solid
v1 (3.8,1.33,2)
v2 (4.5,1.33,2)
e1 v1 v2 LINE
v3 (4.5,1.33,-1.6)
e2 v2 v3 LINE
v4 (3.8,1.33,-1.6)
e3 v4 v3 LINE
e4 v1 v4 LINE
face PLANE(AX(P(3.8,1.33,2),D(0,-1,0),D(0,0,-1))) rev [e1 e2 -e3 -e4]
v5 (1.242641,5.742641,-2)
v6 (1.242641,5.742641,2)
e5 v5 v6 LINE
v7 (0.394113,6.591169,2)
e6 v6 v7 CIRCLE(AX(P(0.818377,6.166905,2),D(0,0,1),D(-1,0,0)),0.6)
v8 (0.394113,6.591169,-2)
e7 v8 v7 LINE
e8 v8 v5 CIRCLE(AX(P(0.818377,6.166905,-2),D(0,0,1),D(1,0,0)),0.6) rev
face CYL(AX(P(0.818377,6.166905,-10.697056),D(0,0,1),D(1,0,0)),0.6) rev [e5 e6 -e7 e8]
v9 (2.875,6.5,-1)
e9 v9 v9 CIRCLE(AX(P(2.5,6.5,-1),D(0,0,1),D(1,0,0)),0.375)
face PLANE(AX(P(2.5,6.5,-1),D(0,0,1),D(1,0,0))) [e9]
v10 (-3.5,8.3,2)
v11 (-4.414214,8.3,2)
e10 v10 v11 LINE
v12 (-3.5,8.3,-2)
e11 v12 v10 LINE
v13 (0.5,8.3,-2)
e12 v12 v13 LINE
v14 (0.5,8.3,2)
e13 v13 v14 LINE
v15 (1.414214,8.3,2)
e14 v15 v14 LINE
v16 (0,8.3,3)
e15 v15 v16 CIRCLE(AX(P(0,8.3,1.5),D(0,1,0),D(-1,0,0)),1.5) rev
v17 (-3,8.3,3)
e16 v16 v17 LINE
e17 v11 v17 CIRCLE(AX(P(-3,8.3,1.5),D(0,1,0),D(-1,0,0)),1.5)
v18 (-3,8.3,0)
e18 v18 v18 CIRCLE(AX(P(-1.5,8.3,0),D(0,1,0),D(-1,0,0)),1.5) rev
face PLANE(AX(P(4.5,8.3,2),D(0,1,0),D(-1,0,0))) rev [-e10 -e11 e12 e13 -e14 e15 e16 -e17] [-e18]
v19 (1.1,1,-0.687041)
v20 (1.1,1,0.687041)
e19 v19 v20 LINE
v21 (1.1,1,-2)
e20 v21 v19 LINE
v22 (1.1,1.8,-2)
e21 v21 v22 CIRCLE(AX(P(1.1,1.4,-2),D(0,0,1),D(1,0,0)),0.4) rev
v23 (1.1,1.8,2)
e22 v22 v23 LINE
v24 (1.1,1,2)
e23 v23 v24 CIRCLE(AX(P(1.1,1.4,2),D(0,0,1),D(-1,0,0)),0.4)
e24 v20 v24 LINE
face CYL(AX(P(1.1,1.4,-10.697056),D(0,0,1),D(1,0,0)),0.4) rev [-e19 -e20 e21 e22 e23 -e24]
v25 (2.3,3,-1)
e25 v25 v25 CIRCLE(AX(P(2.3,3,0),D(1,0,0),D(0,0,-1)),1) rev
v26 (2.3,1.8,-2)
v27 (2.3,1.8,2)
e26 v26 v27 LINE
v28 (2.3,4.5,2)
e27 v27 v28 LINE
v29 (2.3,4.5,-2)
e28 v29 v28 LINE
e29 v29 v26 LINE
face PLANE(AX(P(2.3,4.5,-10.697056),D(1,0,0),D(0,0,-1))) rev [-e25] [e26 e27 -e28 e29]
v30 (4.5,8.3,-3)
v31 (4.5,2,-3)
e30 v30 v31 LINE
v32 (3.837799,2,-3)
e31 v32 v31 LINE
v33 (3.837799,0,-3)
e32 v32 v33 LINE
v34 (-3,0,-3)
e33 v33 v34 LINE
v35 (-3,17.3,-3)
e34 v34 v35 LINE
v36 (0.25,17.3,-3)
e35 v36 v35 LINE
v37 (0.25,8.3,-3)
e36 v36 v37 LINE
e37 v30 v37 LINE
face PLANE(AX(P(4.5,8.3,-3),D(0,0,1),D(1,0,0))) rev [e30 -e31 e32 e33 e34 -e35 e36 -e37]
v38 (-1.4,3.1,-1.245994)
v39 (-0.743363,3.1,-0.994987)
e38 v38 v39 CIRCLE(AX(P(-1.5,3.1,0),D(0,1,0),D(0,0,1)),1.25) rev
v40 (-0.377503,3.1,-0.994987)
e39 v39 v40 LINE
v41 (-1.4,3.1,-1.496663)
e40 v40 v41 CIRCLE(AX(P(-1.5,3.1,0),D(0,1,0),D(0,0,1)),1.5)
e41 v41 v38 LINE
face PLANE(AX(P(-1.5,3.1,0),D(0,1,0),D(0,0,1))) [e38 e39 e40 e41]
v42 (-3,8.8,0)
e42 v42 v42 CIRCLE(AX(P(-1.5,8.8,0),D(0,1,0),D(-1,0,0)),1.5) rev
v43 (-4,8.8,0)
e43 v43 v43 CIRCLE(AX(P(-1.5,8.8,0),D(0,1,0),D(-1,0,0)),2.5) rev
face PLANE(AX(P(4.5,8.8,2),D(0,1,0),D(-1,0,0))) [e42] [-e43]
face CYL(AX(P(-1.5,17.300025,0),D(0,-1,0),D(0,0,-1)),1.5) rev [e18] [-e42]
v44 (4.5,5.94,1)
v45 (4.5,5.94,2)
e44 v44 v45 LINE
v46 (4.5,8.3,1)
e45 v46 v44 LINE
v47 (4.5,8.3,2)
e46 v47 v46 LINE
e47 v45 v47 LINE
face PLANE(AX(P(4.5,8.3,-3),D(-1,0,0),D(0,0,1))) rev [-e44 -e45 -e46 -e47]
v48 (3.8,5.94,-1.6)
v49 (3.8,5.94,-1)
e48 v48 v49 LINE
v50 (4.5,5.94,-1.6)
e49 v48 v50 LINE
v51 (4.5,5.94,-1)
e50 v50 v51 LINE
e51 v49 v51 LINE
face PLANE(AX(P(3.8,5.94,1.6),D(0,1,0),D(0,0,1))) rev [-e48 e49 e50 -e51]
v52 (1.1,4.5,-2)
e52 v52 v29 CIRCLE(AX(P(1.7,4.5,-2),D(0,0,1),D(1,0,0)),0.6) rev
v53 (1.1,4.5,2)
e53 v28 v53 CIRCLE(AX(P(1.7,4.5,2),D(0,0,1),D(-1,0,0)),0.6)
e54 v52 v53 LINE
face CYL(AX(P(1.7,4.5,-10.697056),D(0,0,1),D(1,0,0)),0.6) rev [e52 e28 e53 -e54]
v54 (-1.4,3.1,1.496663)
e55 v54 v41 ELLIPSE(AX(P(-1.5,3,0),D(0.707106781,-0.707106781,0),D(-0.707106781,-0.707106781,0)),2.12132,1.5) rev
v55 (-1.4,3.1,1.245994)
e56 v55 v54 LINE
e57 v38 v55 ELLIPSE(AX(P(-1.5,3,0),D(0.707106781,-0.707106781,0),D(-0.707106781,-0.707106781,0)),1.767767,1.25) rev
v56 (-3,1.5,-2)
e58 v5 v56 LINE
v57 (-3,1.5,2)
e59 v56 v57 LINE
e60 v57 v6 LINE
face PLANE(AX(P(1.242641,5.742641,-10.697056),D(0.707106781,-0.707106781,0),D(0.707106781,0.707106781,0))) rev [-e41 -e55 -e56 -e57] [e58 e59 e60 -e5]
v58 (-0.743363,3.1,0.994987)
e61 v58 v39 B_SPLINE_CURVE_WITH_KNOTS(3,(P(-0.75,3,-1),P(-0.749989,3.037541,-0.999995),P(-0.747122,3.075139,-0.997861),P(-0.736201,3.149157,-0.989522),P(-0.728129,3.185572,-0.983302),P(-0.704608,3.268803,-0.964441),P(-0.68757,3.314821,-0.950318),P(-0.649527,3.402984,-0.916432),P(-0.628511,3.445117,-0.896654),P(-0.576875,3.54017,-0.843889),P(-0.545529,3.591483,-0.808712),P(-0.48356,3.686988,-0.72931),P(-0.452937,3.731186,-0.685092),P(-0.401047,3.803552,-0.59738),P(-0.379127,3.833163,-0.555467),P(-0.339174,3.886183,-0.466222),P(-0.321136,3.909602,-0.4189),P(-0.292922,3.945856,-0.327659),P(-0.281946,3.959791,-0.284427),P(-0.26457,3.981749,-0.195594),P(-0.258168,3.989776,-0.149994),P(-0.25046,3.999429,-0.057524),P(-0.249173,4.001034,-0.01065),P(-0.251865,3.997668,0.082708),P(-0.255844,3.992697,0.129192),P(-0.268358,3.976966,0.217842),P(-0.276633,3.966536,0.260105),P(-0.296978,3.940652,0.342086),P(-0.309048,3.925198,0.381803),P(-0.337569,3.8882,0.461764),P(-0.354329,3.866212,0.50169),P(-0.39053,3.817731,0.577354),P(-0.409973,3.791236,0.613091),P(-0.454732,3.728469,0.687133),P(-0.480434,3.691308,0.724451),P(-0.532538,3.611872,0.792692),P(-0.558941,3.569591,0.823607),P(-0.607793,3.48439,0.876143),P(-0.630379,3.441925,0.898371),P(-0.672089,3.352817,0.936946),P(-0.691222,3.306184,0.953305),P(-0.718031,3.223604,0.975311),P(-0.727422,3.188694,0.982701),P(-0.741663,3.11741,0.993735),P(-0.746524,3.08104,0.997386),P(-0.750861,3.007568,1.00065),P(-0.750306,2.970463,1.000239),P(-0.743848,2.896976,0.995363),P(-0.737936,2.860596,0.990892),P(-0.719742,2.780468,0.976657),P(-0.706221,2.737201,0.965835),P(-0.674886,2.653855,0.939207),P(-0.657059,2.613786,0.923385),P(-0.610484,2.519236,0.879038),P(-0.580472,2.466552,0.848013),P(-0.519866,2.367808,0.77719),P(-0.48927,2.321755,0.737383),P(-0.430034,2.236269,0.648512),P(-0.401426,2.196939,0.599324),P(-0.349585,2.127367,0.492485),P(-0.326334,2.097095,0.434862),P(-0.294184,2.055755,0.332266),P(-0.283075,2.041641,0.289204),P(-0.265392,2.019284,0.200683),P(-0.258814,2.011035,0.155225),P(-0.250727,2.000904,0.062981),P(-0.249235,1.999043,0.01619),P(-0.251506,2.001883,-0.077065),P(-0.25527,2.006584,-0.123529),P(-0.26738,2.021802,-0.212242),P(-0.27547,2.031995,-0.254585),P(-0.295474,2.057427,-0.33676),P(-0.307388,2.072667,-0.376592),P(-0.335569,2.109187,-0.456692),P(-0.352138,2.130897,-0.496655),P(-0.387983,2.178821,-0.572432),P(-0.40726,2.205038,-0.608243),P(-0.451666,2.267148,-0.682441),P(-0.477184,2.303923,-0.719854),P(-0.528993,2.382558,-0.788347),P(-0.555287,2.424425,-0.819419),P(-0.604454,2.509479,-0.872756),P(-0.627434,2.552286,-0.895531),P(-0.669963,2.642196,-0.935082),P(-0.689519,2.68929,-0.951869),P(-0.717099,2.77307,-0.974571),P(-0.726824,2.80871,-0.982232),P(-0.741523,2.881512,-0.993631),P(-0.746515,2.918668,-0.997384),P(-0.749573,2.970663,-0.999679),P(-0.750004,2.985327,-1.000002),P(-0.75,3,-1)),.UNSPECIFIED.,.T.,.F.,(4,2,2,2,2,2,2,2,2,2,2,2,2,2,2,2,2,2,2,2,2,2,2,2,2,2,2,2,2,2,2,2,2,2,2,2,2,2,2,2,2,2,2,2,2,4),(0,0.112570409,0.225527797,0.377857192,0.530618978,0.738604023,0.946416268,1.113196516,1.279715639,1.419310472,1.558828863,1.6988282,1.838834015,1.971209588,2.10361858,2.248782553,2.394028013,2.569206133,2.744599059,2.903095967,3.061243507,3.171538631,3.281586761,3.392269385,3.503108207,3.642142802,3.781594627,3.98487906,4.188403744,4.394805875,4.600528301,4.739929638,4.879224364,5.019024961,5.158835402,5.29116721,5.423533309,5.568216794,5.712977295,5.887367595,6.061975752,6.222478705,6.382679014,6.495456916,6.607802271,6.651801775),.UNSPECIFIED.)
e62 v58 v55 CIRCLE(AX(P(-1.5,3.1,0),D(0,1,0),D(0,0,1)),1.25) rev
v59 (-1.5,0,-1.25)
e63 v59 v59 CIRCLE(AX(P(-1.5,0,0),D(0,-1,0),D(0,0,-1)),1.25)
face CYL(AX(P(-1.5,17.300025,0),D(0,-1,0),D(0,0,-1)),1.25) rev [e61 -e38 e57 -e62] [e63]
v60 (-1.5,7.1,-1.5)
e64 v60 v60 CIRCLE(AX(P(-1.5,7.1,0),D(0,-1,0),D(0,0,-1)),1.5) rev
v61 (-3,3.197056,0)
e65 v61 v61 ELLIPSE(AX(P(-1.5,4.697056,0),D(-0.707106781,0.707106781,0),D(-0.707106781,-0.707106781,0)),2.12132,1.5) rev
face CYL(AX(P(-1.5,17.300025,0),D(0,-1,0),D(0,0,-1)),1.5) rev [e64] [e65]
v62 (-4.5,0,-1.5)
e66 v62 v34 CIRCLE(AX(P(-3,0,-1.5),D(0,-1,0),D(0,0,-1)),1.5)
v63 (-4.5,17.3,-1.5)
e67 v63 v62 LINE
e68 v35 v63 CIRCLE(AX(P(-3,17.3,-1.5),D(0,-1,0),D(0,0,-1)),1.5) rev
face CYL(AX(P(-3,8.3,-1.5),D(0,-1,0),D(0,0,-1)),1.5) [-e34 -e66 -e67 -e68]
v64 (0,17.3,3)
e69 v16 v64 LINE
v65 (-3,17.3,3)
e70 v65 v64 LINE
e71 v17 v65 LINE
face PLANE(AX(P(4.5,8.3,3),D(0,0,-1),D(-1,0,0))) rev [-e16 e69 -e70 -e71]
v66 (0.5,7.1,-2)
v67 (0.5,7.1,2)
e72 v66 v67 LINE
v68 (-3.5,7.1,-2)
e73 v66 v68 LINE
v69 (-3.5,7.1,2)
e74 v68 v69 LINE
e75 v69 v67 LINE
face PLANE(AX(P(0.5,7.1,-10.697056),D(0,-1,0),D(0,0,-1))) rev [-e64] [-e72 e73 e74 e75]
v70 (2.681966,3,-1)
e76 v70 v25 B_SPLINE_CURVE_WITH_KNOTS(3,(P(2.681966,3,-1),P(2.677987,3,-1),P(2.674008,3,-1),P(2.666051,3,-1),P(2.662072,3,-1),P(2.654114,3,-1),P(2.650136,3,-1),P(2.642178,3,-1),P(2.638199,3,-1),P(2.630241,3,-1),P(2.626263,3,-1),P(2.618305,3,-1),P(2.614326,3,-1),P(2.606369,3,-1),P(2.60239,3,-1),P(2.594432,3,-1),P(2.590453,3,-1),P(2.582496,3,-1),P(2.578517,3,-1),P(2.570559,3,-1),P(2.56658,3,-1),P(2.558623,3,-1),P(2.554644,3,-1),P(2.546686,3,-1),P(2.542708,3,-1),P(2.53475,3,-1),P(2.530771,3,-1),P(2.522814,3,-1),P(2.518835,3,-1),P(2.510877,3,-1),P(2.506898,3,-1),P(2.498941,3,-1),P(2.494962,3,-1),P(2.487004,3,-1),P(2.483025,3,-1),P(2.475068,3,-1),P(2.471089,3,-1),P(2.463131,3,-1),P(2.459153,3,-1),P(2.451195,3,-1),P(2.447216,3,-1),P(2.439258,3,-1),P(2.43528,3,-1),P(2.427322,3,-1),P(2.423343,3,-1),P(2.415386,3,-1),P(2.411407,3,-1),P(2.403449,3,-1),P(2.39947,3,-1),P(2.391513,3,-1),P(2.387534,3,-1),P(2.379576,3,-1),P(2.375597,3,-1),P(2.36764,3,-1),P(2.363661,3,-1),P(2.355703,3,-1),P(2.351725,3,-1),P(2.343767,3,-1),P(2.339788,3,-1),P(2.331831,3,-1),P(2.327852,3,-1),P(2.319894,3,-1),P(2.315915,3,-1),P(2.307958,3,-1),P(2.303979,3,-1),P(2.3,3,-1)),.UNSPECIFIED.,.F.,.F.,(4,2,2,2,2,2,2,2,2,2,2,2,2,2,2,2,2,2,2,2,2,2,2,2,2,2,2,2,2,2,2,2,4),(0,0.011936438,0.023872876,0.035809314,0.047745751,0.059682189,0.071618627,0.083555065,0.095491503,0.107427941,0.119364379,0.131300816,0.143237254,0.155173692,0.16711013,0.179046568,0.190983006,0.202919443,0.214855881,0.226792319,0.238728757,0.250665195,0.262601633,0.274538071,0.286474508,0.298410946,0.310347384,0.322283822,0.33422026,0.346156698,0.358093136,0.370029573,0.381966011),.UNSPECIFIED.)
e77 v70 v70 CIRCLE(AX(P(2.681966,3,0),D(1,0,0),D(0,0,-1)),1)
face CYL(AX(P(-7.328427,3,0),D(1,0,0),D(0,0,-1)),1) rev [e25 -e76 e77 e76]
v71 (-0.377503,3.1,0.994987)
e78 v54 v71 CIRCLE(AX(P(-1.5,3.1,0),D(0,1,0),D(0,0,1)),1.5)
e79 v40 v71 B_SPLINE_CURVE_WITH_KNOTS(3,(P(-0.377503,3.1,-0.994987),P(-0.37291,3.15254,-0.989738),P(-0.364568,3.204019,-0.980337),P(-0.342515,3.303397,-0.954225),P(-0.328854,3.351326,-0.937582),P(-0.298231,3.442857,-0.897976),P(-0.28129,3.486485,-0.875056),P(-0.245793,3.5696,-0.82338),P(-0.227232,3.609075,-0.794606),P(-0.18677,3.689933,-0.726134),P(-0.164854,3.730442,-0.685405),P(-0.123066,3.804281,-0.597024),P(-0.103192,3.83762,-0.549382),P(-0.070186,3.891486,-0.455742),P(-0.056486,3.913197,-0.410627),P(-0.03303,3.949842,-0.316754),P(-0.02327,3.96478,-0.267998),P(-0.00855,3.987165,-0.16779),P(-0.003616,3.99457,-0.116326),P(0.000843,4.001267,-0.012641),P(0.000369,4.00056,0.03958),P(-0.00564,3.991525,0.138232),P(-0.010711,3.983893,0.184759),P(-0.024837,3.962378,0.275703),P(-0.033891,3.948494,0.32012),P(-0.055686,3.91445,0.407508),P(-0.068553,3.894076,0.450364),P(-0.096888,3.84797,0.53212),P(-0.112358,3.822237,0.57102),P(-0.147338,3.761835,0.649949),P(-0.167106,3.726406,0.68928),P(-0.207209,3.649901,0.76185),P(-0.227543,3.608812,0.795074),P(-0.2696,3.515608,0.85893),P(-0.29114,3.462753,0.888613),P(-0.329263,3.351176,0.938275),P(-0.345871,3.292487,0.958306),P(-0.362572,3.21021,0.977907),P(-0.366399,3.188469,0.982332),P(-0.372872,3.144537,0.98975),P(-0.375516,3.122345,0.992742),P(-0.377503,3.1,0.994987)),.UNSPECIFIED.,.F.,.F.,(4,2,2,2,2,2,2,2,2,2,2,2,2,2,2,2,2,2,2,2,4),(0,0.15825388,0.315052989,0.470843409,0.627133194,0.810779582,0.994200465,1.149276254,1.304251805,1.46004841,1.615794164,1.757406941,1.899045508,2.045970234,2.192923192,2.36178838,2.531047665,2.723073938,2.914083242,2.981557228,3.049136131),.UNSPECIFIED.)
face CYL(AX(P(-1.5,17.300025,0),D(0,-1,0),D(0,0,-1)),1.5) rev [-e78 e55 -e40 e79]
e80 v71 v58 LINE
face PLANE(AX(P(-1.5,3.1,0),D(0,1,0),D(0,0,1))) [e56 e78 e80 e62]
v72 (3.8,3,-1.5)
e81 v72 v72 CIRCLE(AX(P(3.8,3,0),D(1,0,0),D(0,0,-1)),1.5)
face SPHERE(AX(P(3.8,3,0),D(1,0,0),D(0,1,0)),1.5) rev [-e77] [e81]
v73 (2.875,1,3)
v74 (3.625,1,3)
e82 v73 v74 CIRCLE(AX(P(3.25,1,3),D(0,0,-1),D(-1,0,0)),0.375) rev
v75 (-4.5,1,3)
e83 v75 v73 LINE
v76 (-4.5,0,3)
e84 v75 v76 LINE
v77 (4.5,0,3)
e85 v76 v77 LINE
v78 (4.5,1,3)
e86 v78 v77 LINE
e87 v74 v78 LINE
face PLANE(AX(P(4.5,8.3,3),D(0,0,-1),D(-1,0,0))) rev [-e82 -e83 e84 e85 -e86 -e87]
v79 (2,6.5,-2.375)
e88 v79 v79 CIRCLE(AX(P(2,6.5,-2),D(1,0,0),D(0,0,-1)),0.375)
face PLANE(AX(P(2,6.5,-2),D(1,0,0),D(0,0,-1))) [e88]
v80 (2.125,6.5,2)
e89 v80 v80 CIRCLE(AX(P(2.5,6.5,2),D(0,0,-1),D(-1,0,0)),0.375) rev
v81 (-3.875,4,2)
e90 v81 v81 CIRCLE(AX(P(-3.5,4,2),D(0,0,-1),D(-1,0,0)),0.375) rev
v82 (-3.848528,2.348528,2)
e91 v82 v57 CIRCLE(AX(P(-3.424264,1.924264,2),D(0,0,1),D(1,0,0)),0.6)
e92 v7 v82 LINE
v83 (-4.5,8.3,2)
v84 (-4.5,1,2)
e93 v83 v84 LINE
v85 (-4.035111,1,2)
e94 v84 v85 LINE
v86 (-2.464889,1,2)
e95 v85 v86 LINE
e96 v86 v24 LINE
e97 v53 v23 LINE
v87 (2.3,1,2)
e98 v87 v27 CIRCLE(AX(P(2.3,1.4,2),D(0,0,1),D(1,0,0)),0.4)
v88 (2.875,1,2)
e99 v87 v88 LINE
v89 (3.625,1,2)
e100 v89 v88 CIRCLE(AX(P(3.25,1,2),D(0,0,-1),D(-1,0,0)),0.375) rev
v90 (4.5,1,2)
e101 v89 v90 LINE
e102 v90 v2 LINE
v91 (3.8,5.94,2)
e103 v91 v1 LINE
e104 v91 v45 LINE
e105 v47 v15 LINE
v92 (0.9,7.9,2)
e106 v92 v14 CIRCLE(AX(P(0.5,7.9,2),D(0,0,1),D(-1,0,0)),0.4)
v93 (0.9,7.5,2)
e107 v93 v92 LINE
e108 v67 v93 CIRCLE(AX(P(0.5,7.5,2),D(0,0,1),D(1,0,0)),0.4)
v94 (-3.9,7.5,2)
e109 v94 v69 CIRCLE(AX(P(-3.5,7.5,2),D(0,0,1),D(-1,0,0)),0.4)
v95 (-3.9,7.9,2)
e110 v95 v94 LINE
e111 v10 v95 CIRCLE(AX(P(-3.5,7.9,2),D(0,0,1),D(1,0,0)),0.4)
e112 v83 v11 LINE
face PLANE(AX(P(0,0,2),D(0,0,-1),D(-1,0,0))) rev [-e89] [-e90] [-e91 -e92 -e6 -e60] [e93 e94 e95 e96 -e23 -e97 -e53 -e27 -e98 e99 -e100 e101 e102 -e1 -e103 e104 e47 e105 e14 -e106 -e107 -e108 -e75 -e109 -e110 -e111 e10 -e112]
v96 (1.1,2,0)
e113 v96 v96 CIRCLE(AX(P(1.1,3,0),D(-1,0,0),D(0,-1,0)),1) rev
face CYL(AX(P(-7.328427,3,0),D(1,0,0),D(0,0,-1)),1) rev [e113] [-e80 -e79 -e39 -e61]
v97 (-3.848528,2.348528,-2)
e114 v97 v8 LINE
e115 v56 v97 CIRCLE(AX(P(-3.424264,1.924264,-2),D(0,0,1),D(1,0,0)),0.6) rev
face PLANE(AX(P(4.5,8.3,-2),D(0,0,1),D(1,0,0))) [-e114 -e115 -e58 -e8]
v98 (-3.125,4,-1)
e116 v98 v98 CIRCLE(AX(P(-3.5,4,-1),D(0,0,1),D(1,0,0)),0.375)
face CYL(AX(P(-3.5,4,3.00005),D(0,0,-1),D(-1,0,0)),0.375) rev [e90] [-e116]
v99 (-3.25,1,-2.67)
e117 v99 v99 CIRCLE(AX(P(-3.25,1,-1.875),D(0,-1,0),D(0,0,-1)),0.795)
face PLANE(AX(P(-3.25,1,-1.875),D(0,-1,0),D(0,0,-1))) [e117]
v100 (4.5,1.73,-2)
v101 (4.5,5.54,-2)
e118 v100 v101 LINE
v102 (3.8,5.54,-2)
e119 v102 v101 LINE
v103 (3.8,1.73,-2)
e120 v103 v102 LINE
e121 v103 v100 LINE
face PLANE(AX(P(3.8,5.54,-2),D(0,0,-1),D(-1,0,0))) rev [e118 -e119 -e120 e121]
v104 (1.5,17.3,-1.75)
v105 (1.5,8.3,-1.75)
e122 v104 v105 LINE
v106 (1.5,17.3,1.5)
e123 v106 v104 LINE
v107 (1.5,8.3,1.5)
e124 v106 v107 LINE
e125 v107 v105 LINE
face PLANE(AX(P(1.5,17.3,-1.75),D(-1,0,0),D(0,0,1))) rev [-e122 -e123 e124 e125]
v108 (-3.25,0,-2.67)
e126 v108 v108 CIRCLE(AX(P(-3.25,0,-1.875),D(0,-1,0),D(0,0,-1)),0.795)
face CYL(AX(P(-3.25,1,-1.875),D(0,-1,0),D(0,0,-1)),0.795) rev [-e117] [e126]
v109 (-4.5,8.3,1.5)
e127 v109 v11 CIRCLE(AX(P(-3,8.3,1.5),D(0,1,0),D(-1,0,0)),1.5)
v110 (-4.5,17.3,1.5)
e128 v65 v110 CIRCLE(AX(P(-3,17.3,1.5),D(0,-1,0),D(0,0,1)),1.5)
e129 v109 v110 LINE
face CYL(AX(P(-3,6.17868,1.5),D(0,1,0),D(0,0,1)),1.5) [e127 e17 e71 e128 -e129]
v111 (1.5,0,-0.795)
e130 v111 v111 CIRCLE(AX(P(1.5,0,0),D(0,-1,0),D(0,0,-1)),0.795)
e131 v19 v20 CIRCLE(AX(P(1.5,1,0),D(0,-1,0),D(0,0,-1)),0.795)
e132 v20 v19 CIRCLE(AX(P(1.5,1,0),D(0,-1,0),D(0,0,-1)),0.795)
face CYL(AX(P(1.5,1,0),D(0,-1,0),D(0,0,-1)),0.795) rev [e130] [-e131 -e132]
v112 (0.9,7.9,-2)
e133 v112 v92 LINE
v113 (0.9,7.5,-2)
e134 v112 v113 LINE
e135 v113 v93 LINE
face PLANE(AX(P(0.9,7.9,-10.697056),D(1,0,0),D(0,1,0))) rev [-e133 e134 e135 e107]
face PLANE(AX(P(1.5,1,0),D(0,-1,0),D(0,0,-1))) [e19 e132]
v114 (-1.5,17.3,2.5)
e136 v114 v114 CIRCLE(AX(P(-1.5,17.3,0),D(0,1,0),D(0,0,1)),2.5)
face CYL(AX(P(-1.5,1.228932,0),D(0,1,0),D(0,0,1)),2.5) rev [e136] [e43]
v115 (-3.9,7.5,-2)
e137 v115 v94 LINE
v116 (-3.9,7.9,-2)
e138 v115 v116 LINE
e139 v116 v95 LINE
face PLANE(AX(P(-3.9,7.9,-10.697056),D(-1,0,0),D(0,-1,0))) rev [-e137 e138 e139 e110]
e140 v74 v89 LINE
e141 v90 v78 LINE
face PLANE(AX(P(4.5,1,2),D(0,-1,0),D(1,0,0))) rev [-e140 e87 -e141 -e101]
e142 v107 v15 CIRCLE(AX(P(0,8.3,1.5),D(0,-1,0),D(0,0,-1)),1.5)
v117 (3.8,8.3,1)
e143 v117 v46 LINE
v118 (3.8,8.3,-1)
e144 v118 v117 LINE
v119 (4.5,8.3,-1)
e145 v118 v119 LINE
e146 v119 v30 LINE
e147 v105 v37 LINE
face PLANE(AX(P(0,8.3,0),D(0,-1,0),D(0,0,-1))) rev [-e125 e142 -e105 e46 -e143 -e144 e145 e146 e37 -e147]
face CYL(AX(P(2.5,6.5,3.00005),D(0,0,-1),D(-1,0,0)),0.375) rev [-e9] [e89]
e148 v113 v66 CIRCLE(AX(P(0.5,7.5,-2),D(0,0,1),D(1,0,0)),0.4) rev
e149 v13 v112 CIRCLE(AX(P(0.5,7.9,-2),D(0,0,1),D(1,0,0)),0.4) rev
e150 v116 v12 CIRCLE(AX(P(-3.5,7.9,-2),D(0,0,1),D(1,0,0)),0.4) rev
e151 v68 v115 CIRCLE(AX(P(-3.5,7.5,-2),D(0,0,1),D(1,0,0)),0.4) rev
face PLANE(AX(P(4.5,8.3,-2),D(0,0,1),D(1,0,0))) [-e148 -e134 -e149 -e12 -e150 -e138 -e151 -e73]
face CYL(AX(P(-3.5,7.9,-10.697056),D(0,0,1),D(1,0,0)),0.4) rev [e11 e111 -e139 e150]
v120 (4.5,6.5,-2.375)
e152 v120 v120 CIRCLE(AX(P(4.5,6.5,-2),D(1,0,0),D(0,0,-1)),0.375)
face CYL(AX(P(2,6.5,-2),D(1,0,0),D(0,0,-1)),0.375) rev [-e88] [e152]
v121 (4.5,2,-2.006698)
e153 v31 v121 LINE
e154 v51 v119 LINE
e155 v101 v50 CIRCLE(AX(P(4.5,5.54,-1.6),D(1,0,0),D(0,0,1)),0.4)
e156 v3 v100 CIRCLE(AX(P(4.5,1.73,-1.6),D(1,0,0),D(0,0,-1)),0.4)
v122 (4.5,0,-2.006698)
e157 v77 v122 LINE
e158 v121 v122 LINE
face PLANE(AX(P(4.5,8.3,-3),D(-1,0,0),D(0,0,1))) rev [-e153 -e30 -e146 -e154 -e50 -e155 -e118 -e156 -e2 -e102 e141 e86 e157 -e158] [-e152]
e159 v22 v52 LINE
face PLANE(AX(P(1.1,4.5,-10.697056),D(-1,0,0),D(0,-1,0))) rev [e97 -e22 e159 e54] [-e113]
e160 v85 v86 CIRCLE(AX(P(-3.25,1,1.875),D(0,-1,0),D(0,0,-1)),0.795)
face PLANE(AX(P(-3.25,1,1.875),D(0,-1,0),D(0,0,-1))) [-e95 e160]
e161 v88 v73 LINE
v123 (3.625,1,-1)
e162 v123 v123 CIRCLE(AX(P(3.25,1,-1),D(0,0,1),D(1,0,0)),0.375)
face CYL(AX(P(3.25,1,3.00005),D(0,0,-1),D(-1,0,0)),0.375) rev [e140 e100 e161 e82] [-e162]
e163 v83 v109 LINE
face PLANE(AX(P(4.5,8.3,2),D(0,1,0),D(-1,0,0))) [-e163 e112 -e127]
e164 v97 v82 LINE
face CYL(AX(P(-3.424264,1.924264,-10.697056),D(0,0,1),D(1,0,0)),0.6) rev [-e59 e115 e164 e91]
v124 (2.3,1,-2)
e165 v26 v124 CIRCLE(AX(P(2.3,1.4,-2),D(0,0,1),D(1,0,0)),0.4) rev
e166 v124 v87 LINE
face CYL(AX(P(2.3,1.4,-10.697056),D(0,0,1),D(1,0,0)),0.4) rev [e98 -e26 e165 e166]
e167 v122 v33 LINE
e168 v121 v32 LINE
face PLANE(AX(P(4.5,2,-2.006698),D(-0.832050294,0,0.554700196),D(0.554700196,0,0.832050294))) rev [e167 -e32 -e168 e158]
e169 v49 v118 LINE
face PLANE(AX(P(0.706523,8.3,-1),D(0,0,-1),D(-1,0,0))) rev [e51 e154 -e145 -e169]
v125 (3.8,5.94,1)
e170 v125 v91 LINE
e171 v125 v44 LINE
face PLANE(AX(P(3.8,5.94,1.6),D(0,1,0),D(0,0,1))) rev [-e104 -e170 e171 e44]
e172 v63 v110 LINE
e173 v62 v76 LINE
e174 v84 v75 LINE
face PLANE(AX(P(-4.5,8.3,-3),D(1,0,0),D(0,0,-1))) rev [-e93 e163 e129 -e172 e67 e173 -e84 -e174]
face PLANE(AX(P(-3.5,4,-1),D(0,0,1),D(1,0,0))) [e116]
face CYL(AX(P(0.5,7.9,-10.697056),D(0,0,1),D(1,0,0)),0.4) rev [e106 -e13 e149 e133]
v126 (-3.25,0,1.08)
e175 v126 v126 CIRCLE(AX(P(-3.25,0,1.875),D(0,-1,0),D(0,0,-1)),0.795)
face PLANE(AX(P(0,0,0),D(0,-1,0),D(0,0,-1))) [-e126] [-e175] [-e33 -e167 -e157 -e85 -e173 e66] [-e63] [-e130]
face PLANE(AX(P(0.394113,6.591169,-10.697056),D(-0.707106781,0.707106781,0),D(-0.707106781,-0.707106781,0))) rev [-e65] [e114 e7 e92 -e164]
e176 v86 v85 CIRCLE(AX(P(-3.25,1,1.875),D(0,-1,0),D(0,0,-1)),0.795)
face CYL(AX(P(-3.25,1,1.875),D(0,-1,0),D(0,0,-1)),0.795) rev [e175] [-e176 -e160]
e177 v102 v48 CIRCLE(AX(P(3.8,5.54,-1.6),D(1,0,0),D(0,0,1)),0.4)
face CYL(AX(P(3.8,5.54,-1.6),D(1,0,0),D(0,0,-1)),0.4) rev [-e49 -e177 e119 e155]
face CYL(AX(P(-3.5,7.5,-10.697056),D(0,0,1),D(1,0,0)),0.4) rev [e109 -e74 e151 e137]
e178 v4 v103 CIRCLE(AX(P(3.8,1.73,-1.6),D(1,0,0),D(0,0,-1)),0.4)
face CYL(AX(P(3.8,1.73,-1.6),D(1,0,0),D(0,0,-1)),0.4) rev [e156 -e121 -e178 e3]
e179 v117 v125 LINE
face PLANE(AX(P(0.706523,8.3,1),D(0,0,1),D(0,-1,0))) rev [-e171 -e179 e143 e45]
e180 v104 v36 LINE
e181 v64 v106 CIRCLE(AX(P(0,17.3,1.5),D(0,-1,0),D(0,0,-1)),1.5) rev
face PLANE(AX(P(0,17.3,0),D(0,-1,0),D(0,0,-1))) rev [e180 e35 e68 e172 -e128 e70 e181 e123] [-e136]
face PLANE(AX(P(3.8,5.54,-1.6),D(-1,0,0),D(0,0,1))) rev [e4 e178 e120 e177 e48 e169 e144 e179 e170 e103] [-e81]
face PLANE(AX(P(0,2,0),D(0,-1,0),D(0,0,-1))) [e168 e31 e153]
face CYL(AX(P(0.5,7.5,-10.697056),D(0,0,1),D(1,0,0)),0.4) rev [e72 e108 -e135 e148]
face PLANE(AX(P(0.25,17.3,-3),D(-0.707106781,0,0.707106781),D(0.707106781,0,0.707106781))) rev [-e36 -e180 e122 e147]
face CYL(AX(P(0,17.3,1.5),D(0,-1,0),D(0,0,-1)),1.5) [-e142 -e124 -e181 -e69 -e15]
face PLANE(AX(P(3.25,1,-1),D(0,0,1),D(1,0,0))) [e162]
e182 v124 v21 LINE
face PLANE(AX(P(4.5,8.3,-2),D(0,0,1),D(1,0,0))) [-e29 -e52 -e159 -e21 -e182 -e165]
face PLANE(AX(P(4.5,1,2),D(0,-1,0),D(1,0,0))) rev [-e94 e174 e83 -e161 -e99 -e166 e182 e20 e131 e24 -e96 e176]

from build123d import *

# Parameters (mm, degrees)
SKETCH1_W                   = 9
SKETCH1_H                   = 6
MAIN_BODY_EXT_DEPTH         = 8.3
EMISSION_PATH_EXT_DEPTH     = 9
SKETCH3_R                   = 1.25
EMISSION_AND_GRIN_CUT_DEPTH = 19.125672401
SKETCH4_R                   = 1
DRUM_LENS_CUT_DEPTH         = 7
SKETCH5_W                   = 9
SKETCH5_H                   = 7.3
FILTERSET_CUT1_DEPTH        = 1
FILTERSET_CUT2_DEPTH        = 4
SKETCH10_R                  = 2.5
EMISSION_LENS_CUT_DEPTH     = 8.5
SKETCH15_R                  = 0.795
MAGNETS_CUT_DEPTH           = 1
SCREW_HOLES_CUT_DEPTH       = 19.561788707
SCREW_HOLES_CUT_DEPTH_BACK  = 3
SKETCH18_R                  = 0.375
EXTERNAL_FILLET_1_R         = 1.5
CUT_EXTRUDE8_DEPTH          = 12.545128843
CUT_EXTRUDE8_DEPTH_BACK     = 4
SKETCH28_R                  = 1.5
CUT_EXTRUDE9_DEPTH          = 2
CUT_EXTRUDE10_DEPTH         = 0.7
SKETCH29_R                  = 0.375
CUT_EXTRUDE11_DEPTH         = 2.5
SKETCH32_W                  = 2
SKETCH32_H                  = 2.36
CUT_EXTRUDE14_DEPTH         = 0.7
CUT_EXTRUDE16_DEPTH         = 9


with BuildPart() as part:
    # Sketch1 → Main Body Ext (new body)
    with BuildSketch(Plane(origin=(0, 0, 0), x_dir=(1, 0, 0), z_dir=(0, 1, 0))):
        Rectangle(SKETCH1_W, SKETCH1_H)
    extrude(amount=MAIN_BODY_EXT_DEPTH)

    # Sketch8 → Emission Path Ext (add)
    with BuildSketch(Plane(origin=(0, 8.3, 0), x_dir=(1, 0, 0), z_dir=(0, 1, 0))):
        Polygon((0.25, 3), (1.5, 1.75), (1.5, -3), (-4.5, -3), (-4.5, 3), align=None)
    extrude(amount=EMISSION_PATH_EXT_DEPTH)

    # Sketch3 → Emission and Grin Cut (cut, through all)
    with BuildSketch(Plane.XZ):
        with Locations(Location((-1.5, 0, 0), (0, 0, 270))):
            Circle(SKETCH3_R)
    extrude(amount=-EMISSION_AND_GRIN_CUT_DEPTH, mode=Mode.SUBTRACT)

    # Sketch4 → Drum Lens Cut (cut)
    with BuildSketch(Plane(origin=(4.5, 0, 0), x_dir=(0, 0, -1), z_dir=(1, 0, 0))):
        with Locations((0, 3)):
            Circle(SKETCH4_R)
    extrude(amount=-DRUM_LENS_CUT_DEPTH, mode=Mode.SUBTRACT)

    # Sketch5 → FilterSet Cut1 (cut)
    with BuildSketch(Plane.XY.offset(3)):
        with Locations((0, 4.65)):
            Rectangle(SKETCH5_W, SKETCH5_H)
    extrude(amount=-FILTERSET_CUT1_DEPTH, mode=Mode.SUBTRACT)

    # Sketch6 → FilterSet Cut2 (cut)
    with BuildSketch(Plane.XY.offset(2)):
        with BuildLine():
            Line((2.3, 4.5), (2.3, 1.8))
            ThreePointArc((2.3, 1.8), (2.7, 1.4), (2.3, 1))
            Line((2.3, 1), (1.1, 1))
            ThreePointArc((1.1, 1), (0.7, 1.4), (1.1, 1.8))
            Line((1.1, 1.8), (1.1, 4.5))
            ThreePointArc((1.1, 4.5), (1.7, 5.1), (2.3, 4.5))
        make_face()
        with BuildLine():
            Line((-3.9, 7.9), (-3.9, 7.5))
            ThreePointArc((-3.9, 7.5), (-3.782842712, 7.217157288), (-3.5, 7.1))
            Line((-3.5, 7.1), (0.5, 7.1))
            ThreePointArc((0.5, 7.1), (0.782842712, 7.217157288), (0.9, 7.5))
            Line((0.9, 7.5), (0.9, 7.9))
            ThreePointArc((0.9, 7.9), (0.782842712, 8.182842712), (0.5, 8.3))
            Line((0.5, 8.3), (-3.5, 8.3))
            ThreePointArc((-3.5, 8.3), (-3.782842712, 8.182842712), (-3.9, 7.9))
        make_face()
        with BuildLine():
            Line((0.39411255, 6.591168825), (-3.848528137, 2.348528137))
            ThreePointArc((-3.848528137, 2.348528137), (-3.848528137, 1.5), (-3, 1.5))
            Line((-3, 1.5), (1.242640687, 5.742640687))
            ThreePointArc((1.242640687, 5.742640687), (1.242640687, 6.591168825), (0.39411255, 6.591168825))
        make_face()
    extrude(amount=-FILTERSET_CUT2_DEPTH, mode=Mode.SUBTRACT)

    # Sketch10 → Emission Lens Cut (cut)
    with BuildSketch(Plane(origin=(0, 17.3, 0), x_dir=(1, 0, 0), z_dir=(0, 1, 0))):
        with Locations(Location((-1.5, 0, 0), (0, 0, 270))):
            Circle(SKETCH10_R)
    extrude(amount=-EMISSION_LENS_CUT_DEPTH, mode=Mode.SUBTRACT)

    # Sketch15 → Magnets Cut (cut)
    with BuildSketch(Plane.XZ):
        with Locations(Location((-3.25, -1.875, 0), (0, 0, 270))):
            Circle(SKETCH15_R)
        with Locations(Location((-3.25, 1.875, 0), (0, 0, 270))):
            Circle(SKETCH15_R)
        with Locations(Location((1.5, 0, 0), (0, 0, 270))):
            Circle(SKETCH15_R)
    extrude(amount=-MAGNETS_CUT_DEPTH, mode=Mode.SUBTRACT)

    # Sketch18 → Screw Holes Cut (cut, two sides: drawn at the far end of the back side and taken through both)
    with BuildSketch(Plane.XY.offset(2).offset(-SCREW_HOLES_CUT_DEPTH_BACK)):
        with Locations(Location((-3.5, 4, 0), (0, 0, 180))):
            Circle(SKETCH18_R)
        with Locations(Location((2.5, 6.5, 0), (0, 0, 180))):
            Circle(SKETCH18_R)
        with Locations((3.25, 1)):
            Circle(SKETCH18_R)
    extrude(amount=SCREW_HOLES_CUT_DEPTH + SCREW_HOLES_CUT_DEPTH_BACK, mode=Mode.SUBTRACT)

    # External Fillet 1
    # the kernel refuses this fillet: 1.5 mm, written as the material it takes off along each edge
    with BuildSketch(Plane(origin=(-4.5, -3.75, -3), x_dir=(1, 0, 0), z_dir=(0, 1, 0))) as external_fillet_1_piece_1:
        with BuildLine():
            CenterArc((EXTERNAL_FILLET_1_R, -EXTERNAL_FILLET_1_R), EXTERNAL_FILLET_1_R, 90, 90)
            Line((0, -EXTERNAL_FILLET_1_R), (0, 0))
            Line((0, 0), (EXTERNAL_FILLET_1_R, 0))
        make_face()
    extrude(amount=24.8, mode=Mode.SUBTRACT)
    with BuildSketch(Plane(origin=(1.5, 8.3, 3), x_dir=(0, 0, -1), z_dir=(0, 1, 0))) as external_fillet_1_piece_2:
        with BuildLine():
            CenterArc((EXTERNAL_FILLET_1_R, EXTERNAL_FILLET_1_R), EXTERNAL_FILLET_1_R, 180, 90)
            Line((0, EXTERNAL_FILLET_1_R), (0, 0))
            Line((0, 0), (EXTERNAL_FILLET_1_R, 0))
        make_face()
    extrude(amount=12.75, mode=Mode.SUBTRACT)

    # Sketch28 → Cut-Extrude8 (cut, two sides: drawn at the far end of the back side and taken through both)
    with BuildSketch(Plane(origin=(0, 7.1, 0), x_dir=(1, 0, 0), z_dir=(0, 1, 0)).offset(-CUT_EXTRUDE8_DEPTH_BACK)):
        with Locations(Location((-1.5, 0, 0), (0, 0, 180))):
            Circle(SKETCH28_R)
    extrude(amount=CUT_EXTRUDE8_DEPTH + CUT_EXTRUDE8_DEPTH_BACK, mode=Mode.SUBTRACT)

    # Sketch14 → Cut-Extrude9 (cut)
    with BuildSketch(Plane.XZ):
        Polygon((4.5, -3), (4.5, -2.006698359), (3.837798906, -3), align=None)
    extrude(amount=-CUT_EXTRUDE9_DEPTH, mode=Mode.SUBTRACT)

    # Sketch12 → Cut-Extrude10 (cut)
    with BuildSketch(Plane(origin=(4.5, 0, 0), x_dir=(0, 0, -1), z_dir=(1, 0, 0))):
        with BuildLine():
            Line((1.6, 5.94), (-1.6, 5.94))
            Line((-1.6, 5.94), (-2, 5.94))
            Line((-2, 5.94), (-2, 1.33))
            Line((-2, 1.33), (1.6, 1.33))
            ThreePointArc((1.6, 1.33), (1.882842712, 1.447157288), (2, 1.73))
            Line((2, 1.73), (2, 5.54))
            ThreePointArc((2, 5.54), (1.882842712, 5.822842712), (1.6, 5.94))
        make_face()
    extrude(amount=-CUT_EXTRUDE10_DEPTH, mode=Mode.SUBTRACT)

    # Sketch29 → Cut-Extrude11 (cut)
    with BuildSketch(Plane(origin=(4.5, 0, 0), x_dir=(0, 0, -1), z_dir=(1, 0, 0))):
        with Locations((2, 6.5)):
            Circle(SKETCH29_R)
    extrude(amount=-CUT_EXTRUDE11_DEPTH, mode=Mode.SUBTRACT)

    # Sketch32 → Cut-Extrude14 (cut)
    with BuildSketch(Plane(origin=(4.5, 0, 0), x_dir=(0, 0, -1), z_dir=(1, 0, 0))):
        with Locations((0, 7.12)):
            Rectangle(SKETCH32_W, SKETCH32_H)
    extrude(amount=-CUT_EXTRUDE14_DEPTH, mode=Mode.SUBTRACT)

    # Sketch33 → Cut-Revolve1 (revolve, cut)
    with BuildSketch(Plane.XY, mode=Mode.PRIVATE) as cut_revolve1_sk:
        with BuildLine():
            Line((3.8, 3), (2.3, 3))
            ThreePointArc((2.3, 3), (2.739339828, 4.060660172), (3.8, 4.5))
            Line((3.8, 4.5), (3.8, 3))
        make_face()
    revolve(cut_revolve1_sk.sketch.rotate(Axis((3.8, 3, 0), (-1, 0, 0)), 90), axis=Axis((3.8, 3, 0), (-1, 0, 0)), mode=Mode.SUBTRACT)

    # Sketch36 → Cut-Extrude16 (cut)
    with BuildSketch(Plane(origin=(0, 17.3, 0), x_dir=(1, 0, 0), z_dir=(0, 1, 0))):
        with BuildLine():
            Line((-4.5, -1.5), (-4.5, -3))
            Line((-4.5, -3), (-3, -3))
            ThreePointArc((-3, -3), (-4.060660172, -2.560660172), (-4.5, -1.5))
        make_face()
    extrude(amount=-CUT_EXTRUDE16_DEPTH, mode=Mode.SUBTRACT)


solid = part.part
